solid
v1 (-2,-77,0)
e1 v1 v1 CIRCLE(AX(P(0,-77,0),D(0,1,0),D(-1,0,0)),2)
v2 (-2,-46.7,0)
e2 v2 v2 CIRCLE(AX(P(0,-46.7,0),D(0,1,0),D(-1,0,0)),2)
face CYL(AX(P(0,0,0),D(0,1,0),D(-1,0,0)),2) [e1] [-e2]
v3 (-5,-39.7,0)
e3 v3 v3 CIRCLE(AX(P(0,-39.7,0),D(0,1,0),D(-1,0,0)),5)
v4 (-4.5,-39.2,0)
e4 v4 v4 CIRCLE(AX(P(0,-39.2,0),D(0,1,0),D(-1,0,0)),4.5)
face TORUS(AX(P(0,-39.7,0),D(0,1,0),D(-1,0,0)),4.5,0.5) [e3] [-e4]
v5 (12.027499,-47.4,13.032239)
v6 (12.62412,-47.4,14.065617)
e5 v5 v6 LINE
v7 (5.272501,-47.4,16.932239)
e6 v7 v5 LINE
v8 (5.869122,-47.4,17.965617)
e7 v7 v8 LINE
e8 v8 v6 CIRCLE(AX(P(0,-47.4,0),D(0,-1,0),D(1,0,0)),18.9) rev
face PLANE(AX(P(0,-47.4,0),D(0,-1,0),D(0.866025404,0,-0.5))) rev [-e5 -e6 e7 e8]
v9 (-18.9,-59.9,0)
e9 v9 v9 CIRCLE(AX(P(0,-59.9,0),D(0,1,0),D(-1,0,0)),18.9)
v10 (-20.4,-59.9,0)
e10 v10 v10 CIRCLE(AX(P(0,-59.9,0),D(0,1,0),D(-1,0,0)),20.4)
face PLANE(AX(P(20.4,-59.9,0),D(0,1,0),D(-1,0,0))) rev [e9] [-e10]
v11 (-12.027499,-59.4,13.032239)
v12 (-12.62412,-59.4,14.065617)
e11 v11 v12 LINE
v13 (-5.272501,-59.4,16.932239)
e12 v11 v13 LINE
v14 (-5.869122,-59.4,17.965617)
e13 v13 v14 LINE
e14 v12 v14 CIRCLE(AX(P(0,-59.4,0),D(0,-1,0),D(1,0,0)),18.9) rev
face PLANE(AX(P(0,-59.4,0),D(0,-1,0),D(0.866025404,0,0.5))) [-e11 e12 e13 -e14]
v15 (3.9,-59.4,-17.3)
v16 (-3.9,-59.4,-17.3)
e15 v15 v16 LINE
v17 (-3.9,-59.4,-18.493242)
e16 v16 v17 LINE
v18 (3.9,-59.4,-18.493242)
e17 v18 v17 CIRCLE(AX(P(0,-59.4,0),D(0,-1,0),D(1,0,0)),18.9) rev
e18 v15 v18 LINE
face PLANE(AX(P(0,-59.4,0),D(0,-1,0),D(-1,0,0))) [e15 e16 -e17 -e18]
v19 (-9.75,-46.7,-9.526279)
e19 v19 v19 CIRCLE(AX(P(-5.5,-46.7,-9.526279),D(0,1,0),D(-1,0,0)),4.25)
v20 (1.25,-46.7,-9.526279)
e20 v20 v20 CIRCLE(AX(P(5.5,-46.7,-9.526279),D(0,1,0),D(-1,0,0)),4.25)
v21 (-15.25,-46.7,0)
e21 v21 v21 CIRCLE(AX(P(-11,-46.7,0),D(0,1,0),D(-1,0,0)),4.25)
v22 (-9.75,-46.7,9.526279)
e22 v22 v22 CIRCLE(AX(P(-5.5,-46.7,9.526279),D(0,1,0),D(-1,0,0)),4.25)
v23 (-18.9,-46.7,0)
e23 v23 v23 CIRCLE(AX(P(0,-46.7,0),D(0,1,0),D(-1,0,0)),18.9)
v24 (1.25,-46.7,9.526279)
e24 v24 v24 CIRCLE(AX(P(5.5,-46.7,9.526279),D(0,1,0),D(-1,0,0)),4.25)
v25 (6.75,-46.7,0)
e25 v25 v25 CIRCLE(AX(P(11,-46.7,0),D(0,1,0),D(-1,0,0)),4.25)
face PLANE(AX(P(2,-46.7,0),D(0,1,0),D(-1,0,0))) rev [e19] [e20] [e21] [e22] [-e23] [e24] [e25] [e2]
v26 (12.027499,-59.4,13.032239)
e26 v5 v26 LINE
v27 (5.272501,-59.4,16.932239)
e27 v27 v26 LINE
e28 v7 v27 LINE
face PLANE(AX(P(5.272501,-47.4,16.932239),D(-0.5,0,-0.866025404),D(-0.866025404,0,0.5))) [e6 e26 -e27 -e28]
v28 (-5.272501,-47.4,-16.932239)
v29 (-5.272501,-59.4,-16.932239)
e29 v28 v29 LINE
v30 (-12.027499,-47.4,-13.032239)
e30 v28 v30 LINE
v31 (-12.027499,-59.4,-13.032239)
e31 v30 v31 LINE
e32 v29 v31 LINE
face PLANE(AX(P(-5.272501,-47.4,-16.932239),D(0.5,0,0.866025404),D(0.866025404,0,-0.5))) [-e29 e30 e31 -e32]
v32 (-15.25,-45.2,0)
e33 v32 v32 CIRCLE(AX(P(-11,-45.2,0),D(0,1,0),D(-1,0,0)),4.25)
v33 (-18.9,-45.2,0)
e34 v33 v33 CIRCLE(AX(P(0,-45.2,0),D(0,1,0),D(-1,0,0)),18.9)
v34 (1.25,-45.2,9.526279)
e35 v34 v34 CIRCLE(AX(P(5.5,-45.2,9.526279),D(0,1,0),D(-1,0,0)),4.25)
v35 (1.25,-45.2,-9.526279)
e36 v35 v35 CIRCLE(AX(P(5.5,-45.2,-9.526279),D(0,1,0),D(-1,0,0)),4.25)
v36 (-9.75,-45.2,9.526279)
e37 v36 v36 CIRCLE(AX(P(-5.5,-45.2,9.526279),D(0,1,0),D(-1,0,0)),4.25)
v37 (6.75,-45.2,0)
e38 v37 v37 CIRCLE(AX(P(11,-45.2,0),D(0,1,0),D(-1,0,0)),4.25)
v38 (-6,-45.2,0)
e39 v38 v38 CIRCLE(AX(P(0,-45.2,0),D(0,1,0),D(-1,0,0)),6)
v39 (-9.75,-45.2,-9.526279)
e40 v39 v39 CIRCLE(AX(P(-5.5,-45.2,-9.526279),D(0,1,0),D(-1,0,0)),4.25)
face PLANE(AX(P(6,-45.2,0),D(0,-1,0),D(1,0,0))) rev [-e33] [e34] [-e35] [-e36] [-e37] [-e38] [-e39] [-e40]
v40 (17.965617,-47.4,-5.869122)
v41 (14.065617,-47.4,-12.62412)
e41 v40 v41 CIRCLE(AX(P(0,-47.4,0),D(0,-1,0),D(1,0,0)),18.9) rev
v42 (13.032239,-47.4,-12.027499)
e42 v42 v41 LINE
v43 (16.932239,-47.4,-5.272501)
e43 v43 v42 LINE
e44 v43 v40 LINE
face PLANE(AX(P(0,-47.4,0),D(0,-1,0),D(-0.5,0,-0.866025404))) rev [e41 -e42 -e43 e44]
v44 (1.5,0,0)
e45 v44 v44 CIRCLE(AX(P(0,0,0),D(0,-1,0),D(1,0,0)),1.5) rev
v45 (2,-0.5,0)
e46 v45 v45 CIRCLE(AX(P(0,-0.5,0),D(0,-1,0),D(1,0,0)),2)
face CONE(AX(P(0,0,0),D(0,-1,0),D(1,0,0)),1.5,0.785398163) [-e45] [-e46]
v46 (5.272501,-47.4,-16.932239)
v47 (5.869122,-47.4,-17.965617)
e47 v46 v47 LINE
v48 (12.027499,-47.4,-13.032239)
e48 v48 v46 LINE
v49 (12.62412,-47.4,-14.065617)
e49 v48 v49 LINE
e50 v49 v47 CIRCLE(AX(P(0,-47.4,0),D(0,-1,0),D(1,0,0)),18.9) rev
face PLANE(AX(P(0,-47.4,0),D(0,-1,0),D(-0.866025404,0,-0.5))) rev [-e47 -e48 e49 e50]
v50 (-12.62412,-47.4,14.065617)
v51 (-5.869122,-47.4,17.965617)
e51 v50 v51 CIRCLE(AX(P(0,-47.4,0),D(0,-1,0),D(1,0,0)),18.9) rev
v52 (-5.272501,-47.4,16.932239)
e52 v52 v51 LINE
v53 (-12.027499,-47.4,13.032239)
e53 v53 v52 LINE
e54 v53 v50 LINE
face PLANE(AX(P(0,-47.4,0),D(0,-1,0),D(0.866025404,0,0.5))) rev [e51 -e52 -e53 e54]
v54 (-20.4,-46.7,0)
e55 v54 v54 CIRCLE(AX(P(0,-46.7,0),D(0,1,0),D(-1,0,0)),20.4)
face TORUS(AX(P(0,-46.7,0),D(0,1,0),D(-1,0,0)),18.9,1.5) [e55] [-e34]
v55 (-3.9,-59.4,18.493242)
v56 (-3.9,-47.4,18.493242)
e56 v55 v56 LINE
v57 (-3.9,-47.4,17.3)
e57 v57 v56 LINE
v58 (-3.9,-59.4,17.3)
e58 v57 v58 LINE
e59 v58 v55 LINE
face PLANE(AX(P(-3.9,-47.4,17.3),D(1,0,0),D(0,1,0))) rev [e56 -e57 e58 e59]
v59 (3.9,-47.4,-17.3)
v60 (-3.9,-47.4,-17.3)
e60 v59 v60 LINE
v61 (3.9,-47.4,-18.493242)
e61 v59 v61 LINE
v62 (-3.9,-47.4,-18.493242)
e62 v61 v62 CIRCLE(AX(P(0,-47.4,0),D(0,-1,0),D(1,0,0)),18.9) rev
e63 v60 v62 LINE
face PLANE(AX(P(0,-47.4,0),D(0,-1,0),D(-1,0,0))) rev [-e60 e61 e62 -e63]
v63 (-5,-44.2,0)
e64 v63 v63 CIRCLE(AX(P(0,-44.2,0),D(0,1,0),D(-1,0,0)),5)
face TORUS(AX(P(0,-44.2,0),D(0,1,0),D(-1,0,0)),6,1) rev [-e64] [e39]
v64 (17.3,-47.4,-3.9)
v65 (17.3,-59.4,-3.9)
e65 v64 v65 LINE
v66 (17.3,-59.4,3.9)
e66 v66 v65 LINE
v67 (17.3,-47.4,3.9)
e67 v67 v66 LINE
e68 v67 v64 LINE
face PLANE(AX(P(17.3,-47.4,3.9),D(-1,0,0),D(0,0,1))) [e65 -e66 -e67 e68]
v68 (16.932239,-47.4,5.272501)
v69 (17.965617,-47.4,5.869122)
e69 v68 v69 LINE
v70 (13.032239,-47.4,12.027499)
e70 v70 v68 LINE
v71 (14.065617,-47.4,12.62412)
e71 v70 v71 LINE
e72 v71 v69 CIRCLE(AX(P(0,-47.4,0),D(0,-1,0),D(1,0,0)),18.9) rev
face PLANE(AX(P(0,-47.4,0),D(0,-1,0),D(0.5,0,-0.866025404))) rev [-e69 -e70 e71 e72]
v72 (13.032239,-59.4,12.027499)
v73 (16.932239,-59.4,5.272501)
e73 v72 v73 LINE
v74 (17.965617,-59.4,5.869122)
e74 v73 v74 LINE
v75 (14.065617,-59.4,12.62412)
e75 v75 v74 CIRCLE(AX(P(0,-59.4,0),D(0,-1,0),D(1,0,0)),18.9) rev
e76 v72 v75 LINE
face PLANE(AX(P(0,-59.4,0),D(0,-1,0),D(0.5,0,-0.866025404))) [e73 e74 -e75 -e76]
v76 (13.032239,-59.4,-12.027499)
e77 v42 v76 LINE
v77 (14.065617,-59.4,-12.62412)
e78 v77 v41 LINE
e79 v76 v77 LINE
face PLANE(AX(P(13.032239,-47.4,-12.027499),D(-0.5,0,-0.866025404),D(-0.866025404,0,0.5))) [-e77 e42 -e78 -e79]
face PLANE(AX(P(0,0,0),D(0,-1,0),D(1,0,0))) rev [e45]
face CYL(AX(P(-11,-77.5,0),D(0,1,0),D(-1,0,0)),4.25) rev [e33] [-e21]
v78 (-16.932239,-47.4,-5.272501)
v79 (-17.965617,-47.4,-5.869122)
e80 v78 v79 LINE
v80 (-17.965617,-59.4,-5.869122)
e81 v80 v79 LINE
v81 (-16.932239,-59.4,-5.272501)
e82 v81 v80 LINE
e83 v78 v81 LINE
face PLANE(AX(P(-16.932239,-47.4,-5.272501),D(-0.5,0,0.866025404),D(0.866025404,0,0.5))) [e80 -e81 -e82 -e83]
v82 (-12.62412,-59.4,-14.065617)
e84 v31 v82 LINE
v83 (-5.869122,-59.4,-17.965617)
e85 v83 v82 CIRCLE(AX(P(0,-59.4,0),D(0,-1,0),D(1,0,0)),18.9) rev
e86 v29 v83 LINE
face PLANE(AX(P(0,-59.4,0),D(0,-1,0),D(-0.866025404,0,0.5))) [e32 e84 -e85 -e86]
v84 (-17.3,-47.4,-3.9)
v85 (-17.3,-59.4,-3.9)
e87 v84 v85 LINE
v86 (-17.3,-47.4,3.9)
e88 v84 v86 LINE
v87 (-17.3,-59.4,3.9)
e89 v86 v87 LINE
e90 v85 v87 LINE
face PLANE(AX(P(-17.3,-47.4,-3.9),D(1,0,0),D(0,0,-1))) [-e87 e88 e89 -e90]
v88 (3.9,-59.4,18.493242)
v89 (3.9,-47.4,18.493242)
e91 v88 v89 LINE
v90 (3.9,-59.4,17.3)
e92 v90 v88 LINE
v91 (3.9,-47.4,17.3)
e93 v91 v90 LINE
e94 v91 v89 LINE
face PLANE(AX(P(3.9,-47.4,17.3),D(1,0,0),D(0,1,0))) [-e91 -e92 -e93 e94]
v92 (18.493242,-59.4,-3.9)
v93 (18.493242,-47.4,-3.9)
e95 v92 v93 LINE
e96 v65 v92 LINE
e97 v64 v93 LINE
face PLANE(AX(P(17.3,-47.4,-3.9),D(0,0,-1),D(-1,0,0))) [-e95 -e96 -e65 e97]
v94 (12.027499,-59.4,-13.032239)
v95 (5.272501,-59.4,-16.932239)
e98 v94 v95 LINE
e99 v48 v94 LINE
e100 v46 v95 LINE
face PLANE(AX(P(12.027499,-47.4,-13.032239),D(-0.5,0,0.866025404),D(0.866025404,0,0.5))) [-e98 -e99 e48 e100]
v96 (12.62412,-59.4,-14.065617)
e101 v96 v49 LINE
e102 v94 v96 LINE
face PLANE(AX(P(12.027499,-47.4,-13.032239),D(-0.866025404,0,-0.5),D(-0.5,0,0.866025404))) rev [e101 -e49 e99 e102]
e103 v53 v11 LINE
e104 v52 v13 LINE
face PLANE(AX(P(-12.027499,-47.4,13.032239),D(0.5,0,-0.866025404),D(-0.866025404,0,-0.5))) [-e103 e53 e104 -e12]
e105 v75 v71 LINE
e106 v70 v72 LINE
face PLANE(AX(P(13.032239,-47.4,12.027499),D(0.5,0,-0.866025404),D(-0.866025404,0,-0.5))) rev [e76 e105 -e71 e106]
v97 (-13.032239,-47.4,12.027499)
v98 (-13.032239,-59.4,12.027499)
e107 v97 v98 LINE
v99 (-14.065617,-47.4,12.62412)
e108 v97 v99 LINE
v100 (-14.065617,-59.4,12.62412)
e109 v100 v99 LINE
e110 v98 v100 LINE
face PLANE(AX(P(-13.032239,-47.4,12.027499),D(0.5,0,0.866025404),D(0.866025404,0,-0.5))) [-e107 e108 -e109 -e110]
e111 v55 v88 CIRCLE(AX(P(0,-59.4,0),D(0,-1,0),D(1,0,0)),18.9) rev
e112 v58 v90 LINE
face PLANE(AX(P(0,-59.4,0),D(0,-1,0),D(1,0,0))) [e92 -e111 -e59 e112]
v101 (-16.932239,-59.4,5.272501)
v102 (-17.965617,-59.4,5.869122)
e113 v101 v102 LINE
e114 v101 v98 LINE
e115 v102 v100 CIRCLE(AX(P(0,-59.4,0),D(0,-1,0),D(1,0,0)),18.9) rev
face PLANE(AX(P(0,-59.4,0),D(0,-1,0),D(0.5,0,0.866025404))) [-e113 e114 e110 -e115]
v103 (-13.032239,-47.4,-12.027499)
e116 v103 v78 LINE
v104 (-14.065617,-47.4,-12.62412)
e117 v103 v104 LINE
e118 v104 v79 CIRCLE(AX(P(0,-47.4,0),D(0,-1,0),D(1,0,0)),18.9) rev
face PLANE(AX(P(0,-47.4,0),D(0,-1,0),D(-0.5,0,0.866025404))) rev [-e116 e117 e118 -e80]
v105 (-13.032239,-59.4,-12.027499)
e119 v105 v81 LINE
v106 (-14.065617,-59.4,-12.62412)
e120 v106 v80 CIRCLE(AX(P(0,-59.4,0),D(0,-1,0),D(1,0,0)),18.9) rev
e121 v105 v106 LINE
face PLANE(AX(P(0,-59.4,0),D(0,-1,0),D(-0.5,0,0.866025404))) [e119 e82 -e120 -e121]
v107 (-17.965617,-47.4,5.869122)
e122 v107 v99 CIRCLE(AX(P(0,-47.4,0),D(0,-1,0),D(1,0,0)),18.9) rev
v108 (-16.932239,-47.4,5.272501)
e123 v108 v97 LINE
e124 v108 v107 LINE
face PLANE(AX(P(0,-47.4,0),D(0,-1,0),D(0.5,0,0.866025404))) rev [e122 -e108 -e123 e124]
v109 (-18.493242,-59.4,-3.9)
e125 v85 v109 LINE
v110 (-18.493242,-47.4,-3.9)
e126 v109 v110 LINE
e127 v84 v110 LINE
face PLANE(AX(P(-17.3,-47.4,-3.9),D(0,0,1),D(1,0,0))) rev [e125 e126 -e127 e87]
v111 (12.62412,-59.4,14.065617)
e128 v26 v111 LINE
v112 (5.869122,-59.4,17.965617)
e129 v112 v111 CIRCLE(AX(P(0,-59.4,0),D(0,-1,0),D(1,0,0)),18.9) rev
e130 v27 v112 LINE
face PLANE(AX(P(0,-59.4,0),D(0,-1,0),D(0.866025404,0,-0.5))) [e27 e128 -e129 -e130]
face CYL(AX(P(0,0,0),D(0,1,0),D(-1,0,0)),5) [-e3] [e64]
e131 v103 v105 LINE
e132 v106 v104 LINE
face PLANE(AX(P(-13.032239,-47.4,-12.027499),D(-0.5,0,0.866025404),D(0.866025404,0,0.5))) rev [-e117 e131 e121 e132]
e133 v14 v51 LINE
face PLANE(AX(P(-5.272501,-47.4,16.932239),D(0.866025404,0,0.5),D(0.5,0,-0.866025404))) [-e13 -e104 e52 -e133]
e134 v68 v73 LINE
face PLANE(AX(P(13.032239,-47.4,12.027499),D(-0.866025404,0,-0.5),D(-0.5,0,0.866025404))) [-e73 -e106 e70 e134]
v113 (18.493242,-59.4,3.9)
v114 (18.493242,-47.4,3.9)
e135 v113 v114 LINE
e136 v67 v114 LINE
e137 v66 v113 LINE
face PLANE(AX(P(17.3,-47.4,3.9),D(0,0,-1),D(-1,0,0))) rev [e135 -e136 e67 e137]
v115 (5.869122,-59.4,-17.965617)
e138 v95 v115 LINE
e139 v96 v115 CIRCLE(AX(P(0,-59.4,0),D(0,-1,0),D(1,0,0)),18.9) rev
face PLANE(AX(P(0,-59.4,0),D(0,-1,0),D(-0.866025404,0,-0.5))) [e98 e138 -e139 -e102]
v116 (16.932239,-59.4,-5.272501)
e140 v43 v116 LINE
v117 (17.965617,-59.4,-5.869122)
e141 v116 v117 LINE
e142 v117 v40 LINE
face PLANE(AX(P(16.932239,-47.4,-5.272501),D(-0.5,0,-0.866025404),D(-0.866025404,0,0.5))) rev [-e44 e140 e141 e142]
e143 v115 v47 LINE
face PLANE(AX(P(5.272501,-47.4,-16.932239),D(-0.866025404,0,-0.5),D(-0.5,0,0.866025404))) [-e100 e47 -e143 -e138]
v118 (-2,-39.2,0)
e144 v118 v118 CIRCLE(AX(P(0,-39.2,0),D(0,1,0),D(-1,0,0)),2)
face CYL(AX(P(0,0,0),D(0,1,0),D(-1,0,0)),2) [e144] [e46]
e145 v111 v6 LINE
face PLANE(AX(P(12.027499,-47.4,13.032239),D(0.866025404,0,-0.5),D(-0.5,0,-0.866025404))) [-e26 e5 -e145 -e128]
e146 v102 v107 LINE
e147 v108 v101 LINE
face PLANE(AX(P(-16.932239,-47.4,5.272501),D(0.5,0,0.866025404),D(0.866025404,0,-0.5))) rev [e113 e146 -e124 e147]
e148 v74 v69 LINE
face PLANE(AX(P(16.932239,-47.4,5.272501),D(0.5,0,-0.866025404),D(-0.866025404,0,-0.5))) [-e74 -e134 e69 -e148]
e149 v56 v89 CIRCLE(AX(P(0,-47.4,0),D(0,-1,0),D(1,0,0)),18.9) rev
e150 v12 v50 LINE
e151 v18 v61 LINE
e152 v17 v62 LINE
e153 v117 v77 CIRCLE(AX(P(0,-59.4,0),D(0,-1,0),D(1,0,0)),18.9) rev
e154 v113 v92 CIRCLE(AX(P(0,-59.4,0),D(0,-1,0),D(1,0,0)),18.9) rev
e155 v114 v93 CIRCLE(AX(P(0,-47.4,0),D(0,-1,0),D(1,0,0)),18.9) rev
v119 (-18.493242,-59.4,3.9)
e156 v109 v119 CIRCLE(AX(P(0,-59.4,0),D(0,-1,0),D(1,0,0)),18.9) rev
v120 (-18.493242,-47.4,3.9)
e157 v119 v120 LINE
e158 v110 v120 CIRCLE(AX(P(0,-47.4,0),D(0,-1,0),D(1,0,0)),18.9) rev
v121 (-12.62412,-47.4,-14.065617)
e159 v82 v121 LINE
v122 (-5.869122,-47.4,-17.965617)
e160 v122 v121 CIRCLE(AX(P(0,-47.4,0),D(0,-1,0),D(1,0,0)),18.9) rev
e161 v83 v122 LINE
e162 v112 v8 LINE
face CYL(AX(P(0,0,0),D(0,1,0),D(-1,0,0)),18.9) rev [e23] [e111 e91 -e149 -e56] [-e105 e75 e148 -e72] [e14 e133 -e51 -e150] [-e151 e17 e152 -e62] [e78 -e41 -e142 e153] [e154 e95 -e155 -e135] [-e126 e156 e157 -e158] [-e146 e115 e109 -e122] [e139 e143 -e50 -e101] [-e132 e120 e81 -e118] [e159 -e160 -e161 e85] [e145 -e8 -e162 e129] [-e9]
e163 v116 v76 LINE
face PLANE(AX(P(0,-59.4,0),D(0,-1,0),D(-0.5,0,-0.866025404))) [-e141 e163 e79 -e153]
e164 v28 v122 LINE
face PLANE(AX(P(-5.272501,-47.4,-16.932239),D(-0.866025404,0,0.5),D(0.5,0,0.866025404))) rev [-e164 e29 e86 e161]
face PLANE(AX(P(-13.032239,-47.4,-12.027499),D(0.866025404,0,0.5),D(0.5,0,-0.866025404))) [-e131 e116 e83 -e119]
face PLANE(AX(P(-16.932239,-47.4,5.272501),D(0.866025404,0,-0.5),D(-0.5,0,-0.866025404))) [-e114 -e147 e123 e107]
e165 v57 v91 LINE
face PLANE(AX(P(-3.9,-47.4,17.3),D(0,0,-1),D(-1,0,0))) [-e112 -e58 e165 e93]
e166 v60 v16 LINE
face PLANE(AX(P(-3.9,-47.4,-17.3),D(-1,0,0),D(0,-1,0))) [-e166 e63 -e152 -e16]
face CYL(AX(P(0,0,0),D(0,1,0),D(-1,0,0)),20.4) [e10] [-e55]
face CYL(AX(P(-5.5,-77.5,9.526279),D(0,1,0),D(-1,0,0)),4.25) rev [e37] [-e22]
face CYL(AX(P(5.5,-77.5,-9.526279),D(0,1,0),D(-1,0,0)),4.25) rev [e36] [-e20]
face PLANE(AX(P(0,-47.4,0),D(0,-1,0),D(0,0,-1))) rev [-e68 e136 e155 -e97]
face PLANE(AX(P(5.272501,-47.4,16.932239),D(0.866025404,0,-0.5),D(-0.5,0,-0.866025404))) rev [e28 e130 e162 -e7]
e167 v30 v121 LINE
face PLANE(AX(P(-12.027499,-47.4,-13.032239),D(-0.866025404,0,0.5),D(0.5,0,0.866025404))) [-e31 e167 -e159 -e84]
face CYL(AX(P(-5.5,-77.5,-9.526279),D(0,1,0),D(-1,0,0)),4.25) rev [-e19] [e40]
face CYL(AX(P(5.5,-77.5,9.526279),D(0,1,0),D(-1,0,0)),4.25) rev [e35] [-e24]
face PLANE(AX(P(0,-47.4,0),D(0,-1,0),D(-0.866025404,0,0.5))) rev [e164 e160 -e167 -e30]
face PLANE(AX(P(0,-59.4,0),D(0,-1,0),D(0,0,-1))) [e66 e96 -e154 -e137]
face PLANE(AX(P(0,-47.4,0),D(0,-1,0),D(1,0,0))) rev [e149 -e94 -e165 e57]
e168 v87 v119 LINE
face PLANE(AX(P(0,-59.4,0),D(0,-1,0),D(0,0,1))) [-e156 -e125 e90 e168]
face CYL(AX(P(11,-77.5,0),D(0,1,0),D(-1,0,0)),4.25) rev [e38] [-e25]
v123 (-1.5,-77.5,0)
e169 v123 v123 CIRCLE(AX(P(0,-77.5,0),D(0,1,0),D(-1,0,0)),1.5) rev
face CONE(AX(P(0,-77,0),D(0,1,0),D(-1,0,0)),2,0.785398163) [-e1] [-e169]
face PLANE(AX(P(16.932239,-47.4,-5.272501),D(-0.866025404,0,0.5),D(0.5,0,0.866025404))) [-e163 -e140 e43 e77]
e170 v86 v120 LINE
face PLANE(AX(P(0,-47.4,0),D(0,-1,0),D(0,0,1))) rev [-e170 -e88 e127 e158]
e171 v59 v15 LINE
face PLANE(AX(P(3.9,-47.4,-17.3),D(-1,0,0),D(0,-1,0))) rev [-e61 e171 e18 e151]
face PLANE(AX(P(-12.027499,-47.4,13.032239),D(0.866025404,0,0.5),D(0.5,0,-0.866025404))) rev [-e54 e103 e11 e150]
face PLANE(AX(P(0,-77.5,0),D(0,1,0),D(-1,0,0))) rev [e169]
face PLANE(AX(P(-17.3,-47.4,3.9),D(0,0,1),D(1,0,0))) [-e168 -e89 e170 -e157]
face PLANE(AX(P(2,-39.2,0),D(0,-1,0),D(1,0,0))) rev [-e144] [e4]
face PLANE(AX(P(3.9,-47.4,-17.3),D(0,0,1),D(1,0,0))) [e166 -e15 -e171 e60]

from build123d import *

# Parameters (mm, degrees)
SKETCH2_R          = 4.25
CUT_EXTRUDE1_DEPTH = 54.622383424
CHAMFER1_SIZE      = 0.5
CIRPATTERN1_START  = -59.4
CIRPATTERN1_DEPTH  = 12


# Read off the part's stored shape, not the designer's step: CirPattern1
with BuildPart() as part:
    # Sketch1 → Revolve1 (revolve)
    with BuildSketch(Plane.XY, mode=Mode.PRIVATE) as revolve1_sk:
        with BuildLine():
            Line((0, 0), (0, -77.5))
            Line((0, -77.5), (2, -77.5))
            Line((2, -77.5), (2, -46.7))
            Line((2, -46.7), (18.9, -46.7))
            Line((18.9, -46.7), (18.9, -59.9))
            Line((18.9, -59.9), (20.4, -59.9))
            Line((20.4, -59.9), (20.4, -46.7))
            ThreePointArc((20.4, -46.7), (19.960660172, -45.639339828), (18.9, -45.2))
            Line((18.9, -45.2), (6, -45.2))
            ThreePointArc((6, -45.2), (5.292893219, -44.907106781), (5, -44.2))
            Line((5, -44.2), (5, -39.7))
            ThreePointArc((5, -39.7), (4.853553391, -39.346446609), (4.5, -39.2))
            Line((4.5, -39.2), (2, -39.2))
            Line((2, -39.2), (2, 0))
            Line((2, 0), (0, 0))
        make_face()
    revolve(revolve1_sk.sketch.rotate(Axis((0, 0, 0), (0, -1, 0)), 180), axis=Axis((0, 0, 0), (0, -1, 0)))

    # Sketch2 → Cut-Extrude1 (cut, through all)
    with BuildSketch(Plane(origin=(0, -45.2, 0), x_dir=(1, 0, 0), z_dir=(0, 1, 0))):
        with Locations(Location((5.5, 9.526279442, 0), (0, 0, 180))):
            Circle(SKETCH2_R)
        with Locations(Location((11, 0, 0), (0, 0, 180))):
            Circle(SKETCH2_R)
        with Locations(Location((5.5, -9.526279442, 0), (0, 0, 180))):
            Circle(SKETCH2_R)
        with Locations(Location((-5.5, -9.526279442, 0), (0, 0, 180))):
            Circle(SKETCH2_R)
        with Locations(Location((-11, 0, 0), (0, 0, 180))):
            Circle(SKETCH2_R)
        with Locations(Location((-5.5, 9.526279442, 0), (0, 0, 180))):
            Circle(SKETCH2_R)
    extrude(amount=-CUT_EXTRUDE1_DEPTH, mode=Mode.SUBTRACT)

    # Chamfer1
    chamfer1_edges = [part.edges().sort_by_distance(p)[0] for p in [
        (2, 0, 0),
        (2, -77.5, 0),
    ]]
    chamfer(chamfer1_edges, length=CHAMFER1_SIZE)

    # CirPattern1 outline → CirPattern1 (add)
    with BuildSketch(Plane(origin=(0, 0, 0), x_dir=(1, 0, 0), z_dir=(0, 1, 0)).offset(CIRPATTERN1_START)):
        with BuildLine():
            ThreePointArc((-3.9, -18.493242009), (0, -18.9), (3.9, -18.493242009))
            Line((3.9, -18.493242009), (3.9, -17.3))
            Line((3.9, -17.3), (-3.9, -17.3))
            Line((-3.9, -17.3), (-3.9, -18.493242009))
        make_face()
        with BuildLine():
            Line((5.272500925, -16.932239485), (5.86912193, -17.965617378))
            ThreePointArc((5.86912193, -17.965617378), (9.45, -16.367880131), (12.624120079, -14.065617378))
            Line((12.624120079, -14.065617378), (12.027499075, -13.032239485))
            Line((12.027499075, -13.032239485), (5.272500925, -16.932239485))
        make_face()
        with BuildLine():
            ThreePointArc((-12.624120079, -14.065617378), (-9.45, -16.367880131), (-5.86912193, -17.965617378))
            Line((-5.86912193, -17.965617378), (-5.272500925, -16.932239485))
            Line((-5.272500925, -16.932239485), (-12.027499075, -13.032239485))
            Line((-12.027499075, -13.032239485), (-12.624120079, -14.065617378))
        make_face()
        with BuildLine():
            Line((13.032239485, -12.027499075), (14.065617378, -12.624120079))
            ThreePointArc((14.065617378, -12.624120079), (16.367880131, -9.45), (17.965617378, -5.86912193))
            Line((17.965617378, -5.86912193), (16.932239485, -5.272500925))
            Line((16.932239485, -5.272500925), (13.032239485, -12.027499075))
        make_face()
        with BuildLine():
            ThreePointArc((-17.965617378, -5.86912193), (-16.367880131, -9.45), (-14.065617378, -12.624120079))
            Line((-14.065617378, -12.624120079), (-13.032239485, -12.027499075))
            Line((-13.032239485, -12.027499075), (-16.932239485, -5.272500925))
            Line((-16.932239485, -5.272500925), (-17.965617378, -5.86912193))
        make_face()
        with BuildLine():
            Line((17.3, -3.9), (18.493242009, -3.9))
            ThreePointArc((18.493242009, -3.9), (18.9, 0), (18.493242009, 3.9))
            Line((18.493242009, 3.9), (17.3, 3.9))
            Line((17.3, 3.9), (17.3, -3.9))
        make_face()
        with BuildLine():
            ThreePointArc((-18.493242009, 3.9), (-18.9, 0), (-18.493242009, -3.9))
            Line((-18.493242009, -3.9), (-17.3, -3.9))
            Line((-17.3, -3.9), (-17.3, 3.9))
            Line((-17.3, 3.9), (-18.493242009, 3.9))
        make_face()
        with BuildLine():
            ThreePointArc((-14.065617378, 12.624120079), (-16.367880131, 9.45), (-17.965617378, 5.86912193))
            Line((-17.965617378, 5.86912193), (-16.932239485, 5.272500925))
            Line((-16.932239485, 5.272500925), (-13.032239485, 12.027499075))
            Line((-13.032239485, 12.027499075), (-14.065617378, 12.624120079))
        make_face()
        with BuildLine():
            Line((16.932239485, 5.272500925), (17.965617378, 5.86912193))
            ThreePointArc((17.965617378, 5.86912193), (16.367880131, 9.45), (14.065617378, 12.624120079))
            Line((14.065617378, 12.624120079), (13.032239485, 12.027499075))
            Line((13.032239485, 12.027499075), (16.932239485, 5.272500925))
        make_face()
        with BuildLine():
            ThreePointArc((-5.86912193, 17.965617378), (-9.45, 16.367880131), (-12.624120079, 14.065617378))
            Line((-12.624120079, 14.065617378), (-12.027499075, 13.032239485))
            Line((-12.027499075, 13.032239485), (-5.272500925, 16.932239485))
            Line((-5.272500925, 16.932239485), (-5.86912193, 17.965617378))
        make_face()
        with BuildLine():
            Line((12.027499075, 13.032239485), (12.624120079, 14.065617378))
            ThreePointArc((12.624120079, 14.065617378), (9.45, 16.367880131), (5.86912193, 17.965617378))
            Line((5.86912193, 17.965617378), (5.272500925, 16.932239485))
            Line((5.272500925, 16.932239485), (12.027499075, 13.032239485))
        make_face()
        with BuildLine():
            ThreePointArc((3.9, 18.493242009), (0, 18.9), (-3.9, 18.493242009))
            Line((-3.9, 18.493242009), (-3.9, 17.3))
            Line((-3.9, 17.3), (3.9, 17.3))
            Line((3.9, 17.3), (3.9, 18.493242009))
        make_face()
    extrude(amount=CIRPATTERN1_DEPTH)


solid = part.part
